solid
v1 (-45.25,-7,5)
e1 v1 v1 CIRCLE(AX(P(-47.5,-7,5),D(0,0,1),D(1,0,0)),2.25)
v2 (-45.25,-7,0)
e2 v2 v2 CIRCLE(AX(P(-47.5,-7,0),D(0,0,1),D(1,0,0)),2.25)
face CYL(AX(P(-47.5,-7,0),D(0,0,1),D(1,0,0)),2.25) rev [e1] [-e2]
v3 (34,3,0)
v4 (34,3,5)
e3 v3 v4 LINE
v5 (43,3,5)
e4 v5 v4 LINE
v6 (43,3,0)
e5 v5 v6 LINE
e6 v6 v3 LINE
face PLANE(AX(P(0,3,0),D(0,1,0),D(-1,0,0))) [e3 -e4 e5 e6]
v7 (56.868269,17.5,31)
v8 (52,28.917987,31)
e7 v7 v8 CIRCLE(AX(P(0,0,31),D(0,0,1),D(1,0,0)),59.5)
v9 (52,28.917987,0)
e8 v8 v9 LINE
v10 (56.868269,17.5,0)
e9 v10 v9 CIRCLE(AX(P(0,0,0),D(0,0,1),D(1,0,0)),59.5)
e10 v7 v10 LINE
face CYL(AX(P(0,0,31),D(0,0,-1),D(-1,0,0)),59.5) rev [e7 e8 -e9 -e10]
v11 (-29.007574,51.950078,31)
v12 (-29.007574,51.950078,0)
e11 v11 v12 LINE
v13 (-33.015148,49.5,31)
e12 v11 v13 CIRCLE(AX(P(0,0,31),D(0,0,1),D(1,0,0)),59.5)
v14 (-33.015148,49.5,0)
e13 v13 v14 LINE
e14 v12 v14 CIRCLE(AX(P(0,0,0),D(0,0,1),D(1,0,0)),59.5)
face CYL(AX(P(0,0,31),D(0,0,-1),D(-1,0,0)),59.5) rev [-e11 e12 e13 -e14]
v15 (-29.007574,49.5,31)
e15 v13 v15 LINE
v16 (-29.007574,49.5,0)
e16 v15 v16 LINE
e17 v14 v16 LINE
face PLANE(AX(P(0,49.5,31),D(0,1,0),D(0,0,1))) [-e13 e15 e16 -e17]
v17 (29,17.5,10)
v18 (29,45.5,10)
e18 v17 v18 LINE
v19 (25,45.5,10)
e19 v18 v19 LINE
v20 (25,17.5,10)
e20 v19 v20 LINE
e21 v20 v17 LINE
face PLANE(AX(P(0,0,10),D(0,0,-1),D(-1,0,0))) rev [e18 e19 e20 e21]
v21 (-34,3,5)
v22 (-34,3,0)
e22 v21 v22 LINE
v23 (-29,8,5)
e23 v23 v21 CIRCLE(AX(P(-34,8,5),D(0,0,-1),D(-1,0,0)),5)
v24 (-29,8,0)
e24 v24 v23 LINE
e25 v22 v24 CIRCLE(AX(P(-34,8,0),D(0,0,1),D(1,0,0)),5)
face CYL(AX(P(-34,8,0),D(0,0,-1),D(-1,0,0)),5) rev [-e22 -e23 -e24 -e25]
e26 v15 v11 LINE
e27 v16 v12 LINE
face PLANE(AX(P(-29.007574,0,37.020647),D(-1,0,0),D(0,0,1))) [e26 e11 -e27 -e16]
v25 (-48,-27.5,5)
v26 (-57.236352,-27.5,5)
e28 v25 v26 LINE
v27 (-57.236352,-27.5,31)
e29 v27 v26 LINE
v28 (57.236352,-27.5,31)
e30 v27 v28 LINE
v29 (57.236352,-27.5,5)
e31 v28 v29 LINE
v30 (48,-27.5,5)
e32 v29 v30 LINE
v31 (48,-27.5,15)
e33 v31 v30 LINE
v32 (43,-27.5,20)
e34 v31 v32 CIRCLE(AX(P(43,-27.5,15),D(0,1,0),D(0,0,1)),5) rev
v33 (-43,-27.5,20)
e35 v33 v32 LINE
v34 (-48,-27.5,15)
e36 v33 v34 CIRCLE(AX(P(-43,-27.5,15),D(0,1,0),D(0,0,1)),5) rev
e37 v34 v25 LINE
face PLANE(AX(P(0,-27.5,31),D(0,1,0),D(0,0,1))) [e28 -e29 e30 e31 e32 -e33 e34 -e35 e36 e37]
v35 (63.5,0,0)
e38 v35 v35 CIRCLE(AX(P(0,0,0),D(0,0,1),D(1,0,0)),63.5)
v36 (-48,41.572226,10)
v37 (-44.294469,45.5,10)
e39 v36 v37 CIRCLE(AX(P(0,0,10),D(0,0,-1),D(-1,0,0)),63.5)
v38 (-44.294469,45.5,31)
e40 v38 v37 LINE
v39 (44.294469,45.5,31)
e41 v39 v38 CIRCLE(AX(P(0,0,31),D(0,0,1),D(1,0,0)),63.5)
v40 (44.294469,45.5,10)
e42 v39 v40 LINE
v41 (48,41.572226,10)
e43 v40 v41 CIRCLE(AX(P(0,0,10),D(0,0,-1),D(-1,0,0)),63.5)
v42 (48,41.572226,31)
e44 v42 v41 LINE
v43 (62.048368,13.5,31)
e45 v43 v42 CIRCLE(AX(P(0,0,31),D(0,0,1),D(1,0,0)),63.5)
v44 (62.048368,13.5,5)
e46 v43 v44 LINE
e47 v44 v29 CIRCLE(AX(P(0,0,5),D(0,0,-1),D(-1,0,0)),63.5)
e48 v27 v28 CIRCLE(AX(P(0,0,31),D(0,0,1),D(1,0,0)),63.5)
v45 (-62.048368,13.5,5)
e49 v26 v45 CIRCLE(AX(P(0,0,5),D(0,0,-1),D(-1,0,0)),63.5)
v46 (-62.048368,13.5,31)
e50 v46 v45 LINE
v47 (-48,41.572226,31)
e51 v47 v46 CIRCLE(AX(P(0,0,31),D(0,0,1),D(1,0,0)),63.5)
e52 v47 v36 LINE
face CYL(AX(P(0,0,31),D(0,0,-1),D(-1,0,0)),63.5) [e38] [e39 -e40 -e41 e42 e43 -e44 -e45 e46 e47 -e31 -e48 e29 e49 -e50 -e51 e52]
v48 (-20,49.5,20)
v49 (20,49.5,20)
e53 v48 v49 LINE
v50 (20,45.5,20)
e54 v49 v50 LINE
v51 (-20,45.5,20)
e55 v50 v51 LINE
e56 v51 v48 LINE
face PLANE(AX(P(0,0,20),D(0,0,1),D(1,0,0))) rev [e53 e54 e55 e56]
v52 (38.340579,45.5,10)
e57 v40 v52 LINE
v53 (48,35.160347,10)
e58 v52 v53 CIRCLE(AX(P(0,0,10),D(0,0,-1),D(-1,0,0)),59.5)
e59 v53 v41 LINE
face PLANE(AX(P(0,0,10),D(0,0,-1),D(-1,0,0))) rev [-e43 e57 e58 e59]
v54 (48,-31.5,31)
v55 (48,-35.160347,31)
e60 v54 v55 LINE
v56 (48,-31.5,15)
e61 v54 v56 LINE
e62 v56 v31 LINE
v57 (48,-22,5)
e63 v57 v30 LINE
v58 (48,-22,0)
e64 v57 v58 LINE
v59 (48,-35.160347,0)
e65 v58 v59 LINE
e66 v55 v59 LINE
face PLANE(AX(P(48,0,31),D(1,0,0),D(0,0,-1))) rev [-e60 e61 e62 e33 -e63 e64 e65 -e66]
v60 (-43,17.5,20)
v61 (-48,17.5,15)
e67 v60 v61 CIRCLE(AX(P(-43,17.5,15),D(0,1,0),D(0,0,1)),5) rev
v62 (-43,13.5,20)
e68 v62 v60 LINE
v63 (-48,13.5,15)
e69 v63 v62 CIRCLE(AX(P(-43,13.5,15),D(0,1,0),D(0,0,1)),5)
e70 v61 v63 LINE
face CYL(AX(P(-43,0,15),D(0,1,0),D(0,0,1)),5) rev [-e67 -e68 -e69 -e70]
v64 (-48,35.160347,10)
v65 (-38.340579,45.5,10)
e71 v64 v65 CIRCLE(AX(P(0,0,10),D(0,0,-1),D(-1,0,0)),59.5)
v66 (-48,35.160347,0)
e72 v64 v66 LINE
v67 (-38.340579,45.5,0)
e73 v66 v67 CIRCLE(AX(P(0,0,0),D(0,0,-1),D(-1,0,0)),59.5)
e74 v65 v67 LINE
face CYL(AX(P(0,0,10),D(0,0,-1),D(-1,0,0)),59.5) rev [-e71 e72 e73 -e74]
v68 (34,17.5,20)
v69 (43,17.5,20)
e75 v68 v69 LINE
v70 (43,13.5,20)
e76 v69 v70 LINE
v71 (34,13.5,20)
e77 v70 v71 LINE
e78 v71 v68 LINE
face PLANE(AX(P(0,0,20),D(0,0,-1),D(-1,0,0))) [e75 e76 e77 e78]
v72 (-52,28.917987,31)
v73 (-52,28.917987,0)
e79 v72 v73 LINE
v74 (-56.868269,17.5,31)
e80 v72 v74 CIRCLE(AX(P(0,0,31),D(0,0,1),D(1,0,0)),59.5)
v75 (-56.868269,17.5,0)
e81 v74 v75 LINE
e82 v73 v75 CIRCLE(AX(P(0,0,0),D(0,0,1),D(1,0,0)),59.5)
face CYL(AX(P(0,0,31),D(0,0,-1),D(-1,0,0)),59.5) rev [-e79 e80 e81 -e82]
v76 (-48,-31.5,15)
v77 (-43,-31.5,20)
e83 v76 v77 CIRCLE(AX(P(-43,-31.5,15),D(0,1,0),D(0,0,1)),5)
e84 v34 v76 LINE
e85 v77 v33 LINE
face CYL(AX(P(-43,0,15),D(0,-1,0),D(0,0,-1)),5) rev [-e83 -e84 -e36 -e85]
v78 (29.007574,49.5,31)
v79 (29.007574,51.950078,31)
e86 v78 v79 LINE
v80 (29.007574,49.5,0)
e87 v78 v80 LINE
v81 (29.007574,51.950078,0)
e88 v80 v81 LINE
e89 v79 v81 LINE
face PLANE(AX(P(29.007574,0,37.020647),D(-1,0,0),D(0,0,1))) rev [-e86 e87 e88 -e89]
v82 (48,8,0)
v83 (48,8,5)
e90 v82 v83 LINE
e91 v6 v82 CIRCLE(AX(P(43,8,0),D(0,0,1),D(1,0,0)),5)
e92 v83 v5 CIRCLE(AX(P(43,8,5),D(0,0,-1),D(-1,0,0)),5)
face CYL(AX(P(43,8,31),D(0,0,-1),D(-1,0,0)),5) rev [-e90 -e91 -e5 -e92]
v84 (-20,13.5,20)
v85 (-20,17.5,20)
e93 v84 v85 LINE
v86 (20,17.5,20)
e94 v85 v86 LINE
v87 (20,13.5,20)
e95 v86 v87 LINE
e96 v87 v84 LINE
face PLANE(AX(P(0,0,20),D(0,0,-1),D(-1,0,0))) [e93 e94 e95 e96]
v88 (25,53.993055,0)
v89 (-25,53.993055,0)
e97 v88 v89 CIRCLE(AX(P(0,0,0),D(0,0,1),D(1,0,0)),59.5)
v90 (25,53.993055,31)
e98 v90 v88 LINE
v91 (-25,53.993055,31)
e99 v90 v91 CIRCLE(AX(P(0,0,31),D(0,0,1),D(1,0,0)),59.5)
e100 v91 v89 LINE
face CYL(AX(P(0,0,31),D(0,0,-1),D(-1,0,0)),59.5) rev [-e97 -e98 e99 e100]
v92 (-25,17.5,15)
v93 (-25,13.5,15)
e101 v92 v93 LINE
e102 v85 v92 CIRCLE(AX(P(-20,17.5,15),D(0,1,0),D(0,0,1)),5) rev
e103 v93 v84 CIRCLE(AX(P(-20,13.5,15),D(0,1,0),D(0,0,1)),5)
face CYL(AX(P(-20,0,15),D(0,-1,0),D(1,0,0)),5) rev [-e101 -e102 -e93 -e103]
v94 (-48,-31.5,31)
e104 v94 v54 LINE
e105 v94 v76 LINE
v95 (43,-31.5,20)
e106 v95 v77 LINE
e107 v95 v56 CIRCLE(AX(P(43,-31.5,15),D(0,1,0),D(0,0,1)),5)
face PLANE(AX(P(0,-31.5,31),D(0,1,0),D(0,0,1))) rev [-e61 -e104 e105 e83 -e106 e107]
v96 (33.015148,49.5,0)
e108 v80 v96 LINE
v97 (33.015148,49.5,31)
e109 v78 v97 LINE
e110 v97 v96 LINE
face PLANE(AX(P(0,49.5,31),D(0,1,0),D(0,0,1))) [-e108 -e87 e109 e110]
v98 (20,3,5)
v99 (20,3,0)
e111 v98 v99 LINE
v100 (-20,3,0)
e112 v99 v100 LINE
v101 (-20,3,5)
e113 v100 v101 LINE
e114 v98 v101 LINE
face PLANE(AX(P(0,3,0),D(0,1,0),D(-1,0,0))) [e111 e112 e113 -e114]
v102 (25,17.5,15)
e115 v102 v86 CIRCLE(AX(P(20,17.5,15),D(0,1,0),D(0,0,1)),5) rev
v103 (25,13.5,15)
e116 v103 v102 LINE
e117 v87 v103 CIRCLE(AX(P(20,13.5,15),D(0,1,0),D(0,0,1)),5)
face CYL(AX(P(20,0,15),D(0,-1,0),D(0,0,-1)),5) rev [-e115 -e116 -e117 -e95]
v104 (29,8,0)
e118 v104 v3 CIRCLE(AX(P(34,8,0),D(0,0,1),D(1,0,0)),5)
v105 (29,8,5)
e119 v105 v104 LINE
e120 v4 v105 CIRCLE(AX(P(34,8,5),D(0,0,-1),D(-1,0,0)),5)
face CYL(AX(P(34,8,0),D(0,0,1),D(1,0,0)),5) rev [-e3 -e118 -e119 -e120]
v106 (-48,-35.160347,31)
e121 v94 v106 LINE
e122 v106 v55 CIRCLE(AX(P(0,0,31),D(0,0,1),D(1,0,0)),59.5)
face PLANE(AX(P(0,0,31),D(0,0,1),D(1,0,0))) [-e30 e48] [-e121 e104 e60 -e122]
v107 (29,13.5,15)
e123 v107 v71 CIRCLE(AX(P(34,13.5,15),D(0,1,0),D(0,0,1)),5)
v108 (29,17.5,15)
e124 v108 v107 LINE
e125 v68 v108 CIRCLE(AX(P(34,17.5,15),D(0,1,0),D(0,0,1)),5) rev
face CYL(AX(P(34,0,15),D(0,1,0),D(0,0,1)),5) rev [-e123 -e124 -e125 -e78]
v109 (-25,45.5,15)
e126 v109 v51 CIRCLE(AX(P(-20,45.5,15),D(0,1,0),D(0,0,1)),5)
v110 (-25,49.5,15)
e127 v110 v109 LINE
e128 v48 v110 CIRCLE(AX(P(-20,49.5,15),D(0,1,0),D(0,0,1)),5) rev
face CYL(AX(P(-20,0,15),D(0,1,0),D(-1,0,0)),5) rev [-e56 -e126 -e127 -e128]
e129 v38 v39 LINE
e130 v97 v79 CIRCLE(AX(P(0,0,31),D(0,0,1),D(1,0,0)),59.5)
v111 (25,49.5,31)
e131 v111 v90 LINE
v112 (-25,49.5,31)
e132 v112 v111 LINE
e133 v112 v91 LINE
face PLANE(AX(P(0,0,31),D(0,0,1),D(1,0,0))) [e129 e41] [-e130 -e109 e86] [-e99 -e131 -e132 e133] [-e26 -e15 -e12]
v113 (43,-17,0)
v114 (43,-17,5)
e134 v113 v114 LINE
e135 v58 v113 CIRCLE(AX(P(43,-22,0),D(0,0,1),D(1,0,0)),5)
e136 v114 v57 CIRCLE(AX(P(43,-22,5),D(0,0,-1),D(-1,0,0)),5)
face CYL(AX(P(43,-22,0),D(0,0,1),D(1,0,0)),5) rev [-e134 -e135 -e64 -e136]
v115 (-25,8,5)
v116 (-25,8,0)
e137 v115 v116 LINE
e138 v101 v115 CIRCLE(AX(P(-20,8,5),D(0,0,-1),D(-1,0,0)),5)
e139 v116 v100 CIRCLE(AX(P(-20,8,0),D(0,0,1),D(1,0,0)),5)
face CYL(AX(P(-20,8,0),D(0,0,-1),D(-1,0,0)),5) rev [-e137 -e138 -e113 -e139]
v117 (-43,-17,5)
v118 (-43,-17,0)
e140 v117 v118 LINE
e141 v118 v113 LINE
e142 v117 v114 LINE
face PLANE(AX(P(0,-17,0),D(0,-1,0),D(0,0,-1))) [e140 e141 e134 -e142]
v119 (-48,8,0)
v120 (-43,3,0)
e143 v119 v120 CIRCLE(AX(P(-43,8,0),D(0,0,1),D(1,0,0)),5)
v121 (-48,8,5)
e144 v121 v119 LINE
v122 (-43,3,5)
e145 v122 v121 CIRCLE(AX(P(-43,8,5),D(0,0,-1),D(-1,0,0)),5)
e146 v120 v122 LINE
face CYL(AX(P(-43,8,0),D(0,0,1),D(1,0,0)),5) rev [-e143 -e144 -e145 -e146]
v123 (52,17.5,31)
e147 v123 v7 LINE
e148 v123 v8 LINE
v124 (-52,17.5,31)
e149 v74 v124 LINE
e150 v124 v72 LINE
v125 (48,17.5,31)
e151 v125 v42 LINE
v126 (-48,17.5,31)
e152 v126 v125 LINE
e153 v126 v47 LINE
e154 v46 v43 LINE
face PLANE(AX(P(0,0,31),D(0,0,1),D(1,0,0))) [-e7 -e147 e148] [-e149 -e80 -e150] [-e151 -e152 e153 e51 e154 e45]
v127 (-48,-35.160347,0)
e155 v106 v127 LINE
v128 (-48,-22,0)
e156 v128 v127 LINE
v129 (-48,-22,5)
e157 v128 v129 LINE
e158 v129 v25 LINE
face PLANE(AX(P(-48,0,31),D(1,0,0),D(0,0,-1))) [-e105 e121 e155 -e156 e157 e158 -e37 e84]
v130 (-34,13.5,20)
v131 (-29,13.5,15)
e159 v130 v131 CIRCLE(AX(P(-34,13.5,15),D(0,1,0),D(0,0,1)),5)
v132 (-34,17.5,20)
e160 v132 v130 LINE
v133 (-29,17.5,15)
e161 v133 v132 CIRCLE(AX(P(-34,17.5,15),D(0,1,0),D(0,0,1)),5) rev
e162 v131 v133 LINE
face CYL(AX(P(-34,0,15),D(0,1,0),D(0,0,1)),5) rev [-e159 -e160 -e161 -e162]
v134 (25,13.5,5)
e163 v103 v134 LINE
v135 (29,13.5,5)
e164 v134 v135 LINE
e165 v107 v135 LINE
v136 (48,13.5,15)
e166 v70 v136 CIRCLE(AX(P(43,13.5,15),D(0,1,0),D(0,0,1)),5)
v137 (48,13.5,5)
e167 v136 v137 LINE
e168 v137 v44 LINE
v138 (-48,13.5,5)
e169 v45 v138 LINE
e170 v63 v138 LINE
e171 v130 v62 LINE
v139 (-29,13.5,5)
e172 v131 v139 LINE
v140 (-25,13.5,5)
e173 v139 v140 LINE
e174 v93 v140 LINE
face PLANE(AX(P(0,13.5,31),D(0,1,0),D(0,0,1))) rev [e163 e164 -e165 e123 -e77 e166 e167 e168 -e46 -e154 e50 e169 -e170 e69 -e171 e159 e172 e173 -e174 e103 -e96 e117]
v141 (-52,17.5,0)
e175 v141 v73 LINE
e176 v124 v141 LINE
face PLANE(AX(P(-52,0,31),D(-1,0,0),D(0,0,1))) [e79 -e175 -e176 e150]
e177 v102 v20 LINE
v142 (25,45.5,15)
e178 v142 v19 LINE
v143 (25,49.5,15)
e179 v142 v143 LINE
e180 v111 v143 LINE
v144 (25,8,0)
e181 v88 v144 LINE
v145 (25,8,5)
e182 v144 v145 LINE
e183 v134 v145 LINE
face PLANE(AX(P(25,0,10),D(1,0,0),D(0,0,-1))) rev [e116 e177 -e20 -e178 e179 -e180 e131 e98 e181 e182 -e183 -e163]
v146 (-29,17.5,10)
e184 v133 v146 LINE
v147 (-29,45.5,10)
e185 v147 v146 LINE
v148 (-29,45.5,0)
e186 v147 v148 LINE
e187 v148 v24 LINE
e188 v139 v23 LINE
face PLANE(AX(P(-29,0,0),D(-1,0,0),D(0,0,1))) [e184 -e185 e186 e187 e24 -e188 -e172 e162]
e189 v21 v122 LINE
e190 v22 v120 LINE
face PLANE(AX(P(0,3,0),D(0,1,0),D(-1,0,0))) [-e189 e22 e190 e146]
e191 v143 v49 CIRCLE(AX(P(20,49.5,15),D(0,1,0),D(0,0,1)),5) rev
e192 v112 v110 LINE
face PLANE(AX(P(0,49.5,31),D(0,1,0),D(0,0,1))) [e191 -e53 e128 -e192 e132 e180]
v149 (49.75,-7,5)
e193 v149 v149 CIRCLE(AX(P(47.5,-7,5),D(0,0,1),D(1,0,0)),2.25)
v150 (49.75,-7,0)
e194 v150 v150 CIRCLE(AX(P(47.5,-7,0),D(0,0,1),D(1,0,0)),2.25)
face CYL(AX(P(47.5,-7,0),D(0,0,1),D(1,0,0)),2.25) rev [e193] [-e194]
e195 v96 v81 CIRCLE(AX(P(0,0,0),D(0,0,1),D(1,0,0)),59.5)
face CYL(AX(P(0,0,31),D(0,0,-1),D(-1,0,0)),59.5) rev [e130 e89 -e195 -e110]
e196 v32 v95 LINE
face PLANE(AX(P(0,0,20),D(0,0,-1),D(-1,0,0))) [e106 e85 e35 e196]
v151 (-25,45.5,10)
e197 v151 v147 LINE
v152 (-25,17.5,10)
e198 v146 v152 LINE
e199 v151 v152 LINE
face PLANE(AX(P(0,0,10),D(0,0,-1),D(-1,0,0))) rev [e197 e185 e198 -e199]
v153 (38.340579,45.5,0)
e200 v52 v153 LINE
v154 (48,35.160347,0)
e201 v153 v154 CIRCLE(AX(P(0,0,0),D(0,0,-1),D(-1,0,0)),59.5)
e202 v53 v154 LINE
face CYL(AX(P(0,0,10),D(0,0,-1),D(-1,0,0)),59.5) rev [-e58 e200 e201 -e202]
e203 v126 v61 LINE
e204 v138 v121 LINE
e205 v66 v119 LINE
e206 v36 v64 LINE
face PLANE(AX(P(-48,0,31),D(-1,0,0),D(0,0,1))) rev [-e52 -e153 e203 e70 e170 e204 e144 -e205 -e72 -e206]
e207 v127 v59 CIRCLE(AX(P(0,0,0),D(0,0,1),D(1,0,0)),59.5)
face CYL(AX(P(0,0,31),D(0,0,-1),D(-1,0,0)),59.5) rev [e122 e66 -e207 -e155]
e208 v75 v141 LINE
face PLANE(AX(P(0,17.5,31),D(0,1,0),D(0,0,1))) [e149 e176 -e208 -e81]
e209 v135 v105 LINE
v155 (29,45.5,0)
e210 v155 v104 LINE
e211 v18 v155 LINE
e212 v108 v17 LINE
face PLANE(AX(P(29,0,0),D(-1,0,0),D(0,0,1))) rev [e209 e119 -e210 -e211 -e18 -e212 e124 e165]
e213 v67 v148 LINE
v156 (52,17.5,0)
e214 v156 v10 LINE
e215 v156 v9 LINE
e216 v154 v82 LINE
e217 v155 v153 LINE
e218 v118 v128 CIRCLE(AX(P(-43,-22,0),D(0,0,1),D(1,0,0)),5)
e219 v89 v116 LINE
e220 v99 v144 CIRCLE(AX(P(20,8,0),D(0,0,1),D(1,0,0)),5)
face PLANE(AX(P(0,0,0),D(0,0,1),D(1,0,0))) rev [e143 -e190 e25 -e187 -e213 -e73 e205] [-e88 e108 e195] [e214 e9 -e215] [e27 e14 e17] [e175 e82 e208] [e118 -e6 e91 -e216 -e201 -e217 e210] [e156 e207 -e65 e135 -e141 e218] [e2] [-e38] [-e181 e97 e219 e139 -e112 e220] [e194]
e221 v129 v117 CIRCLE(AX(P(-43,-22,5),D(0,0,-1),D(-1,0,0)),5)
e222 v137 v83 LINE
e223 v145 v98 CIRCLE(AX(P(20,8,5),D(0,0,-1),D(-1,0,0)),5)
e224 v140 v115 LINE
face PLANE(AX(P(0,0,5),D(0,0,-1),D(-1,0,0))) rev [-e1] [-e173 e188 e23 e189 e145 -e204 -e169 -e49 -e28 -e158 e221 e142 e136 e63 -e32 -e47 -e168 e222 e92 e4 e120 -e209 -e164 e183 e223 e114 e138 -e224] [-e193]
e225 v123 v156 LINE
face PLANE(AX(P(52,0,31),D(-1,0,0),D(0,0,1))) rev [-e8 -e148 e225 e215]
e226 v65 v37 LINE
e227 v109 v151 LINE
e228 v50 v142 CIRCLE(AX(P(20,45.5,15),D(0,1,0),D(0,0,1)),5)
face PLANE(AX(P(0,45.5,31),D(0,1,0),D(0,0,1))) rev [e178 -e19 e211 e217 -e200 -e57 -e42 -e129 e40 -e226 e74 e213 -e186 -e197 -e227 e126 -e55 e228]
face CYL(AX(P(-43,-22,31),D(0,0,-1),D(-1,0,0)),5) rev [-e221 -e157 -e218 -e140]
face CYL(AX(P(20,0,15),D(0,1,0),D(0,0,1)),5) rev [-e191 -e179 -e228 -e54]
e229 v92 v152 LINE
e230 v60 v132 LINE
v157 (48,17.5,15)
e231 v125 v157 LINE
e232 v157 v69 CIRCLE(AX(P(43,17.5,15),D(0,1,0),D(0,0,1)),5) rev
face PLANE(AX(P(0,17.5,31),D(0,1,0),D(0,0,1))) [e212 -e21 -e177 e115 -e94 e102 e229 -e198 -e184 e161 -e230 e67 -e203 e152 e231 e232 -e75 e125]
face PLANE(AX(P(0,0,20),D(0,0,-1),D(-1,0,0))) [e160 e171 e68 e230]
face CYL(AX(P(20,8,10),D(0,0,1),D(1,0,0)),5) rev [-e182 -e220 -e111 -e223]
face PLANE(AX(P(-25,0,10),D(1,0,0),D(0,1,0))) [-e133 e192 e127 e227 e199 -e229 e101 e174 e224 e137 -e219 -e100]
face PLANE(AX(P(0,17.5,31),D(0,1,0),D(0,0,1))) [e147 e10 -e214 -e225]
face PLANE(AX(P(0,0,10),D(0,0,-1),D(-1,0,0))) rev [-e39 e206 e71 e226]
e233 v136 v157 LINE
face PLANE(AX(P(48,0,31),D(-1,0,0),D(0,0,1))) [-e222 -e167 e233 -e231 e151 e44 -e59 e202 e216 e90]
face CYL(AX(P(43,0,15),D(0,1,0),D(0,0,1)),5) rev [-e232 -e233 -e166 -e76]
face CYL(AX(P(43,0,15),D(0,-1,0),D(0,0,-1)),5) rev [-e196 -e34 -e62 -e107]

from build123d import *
from build123d.topology import SkipClean

# Parameters (mm, degrees)
BOSS_EXTRUDE1_DEPTH = 31
BOSS_EXTRUDE3_DEPTH = 10
BOSS_EXTRUDE4_DEPTH = 5
SKETCH6_W           = 19
SKETCH6_H           = 10.5
SKETCH6_R           = 2.25
SKETCH6_W_2         = 50
SKETCH6_W_3         = 96
CUT_EXTRUDE1_DEPTH  = 94.490641243
CUT_EXTRUDE2_DEPTH  = 10
SKETCH9_W           = 96
SKETCH9_H           = 4
SKETCH9_W_2         = 19
SKETCH9_W_3         = 50
CUT_EXTRUDE4_DEPTH  = 20
BOSS_EXTRUDE5_DEPTH = 31
FILLET3_R           = 5


with BuildPart() as part:
    # Sketch1 → Boss-Extrude1 (new body)
    with BuildSketch(Plane.XY):
        with BuildLine():
            ThreePointArc((-50.477717856, -31.5), (-51.659400485, -29.522133079), (-52.763623833, -27.5))
            Line((-52.763623833, -27.5), (-57.236352085, -27.5))
            ThreePointArc((-57.236352085, -27.5), (0, -63.5), (57.236352085, -27.5))
            Line((57.236352085, -27.5), (52.763623833, -27.5))
            ThreePointArc((52.763623833, -27.5), (51.659400485, -29.522133079), (50.477717856, -31.5))
            ThreePointArc((50.477717856, -31.5), (49.272860314, -33.353189299), (48, -35.160346983))
            ThreePointArc((48, -35.160346983), (0, -59.5), (-48, -35.160346983))
            ThreePointArc((-48, -35.160346983), (-49.272860314, -33.353189299), (-50.477717856, -31.5))
        make_face()
        with BuildLine():
            Line((52.763623833, -27.5), (-52.763623833, -27.5))
            ThreePointArc((-52.763623833, -27.5), (-51.659400485, -29.522133079), (-50.477717856, -31.5))
            Line((-50.477717856, -31.5), (-48, -31.5))
            Line((-48, -31.5), (48, -31.5))
            Line((48, -31.5), (50.477717856, -31.5))
            ThreePointArc((50.477717856, -31.5), (51.659400485, -29.522133079), (52.763623833, -27.5))
        make_face()
        with BuildLine():
            ThreePointArc((-56.868268832, 17.5), (-57.443088433, 15.50940332), (-57.948252778, 13.5))
            Line((-57.948252778, 13.5), (57.948252778, 13.5))
            ThreePointArc((57.948252778, 13.5), (57.443088433, 15.50940332), (56.868268832, 17.5))
            Line((56.868268832, 17.5), (52, 17.5))
            Line((52, 17.5), (48, 17.5))
            Line((48, 17.5), (-48, 17.5))
            Line((-48, 17.5), (-52, 17.5))
            Line((-52, 17.5), (-56.868268832, 17.5))
        make_face()
        with BuildLine():
            Line((-52, 28.917987482), (-52, 17.5))
            Line((-52, 17.5), (-48, 17.5))
            Line((-48, 17.5), (-48, 35.160346983))
            ThreePointArc((-48, 35.160346983), (-50.097322913, 32.101530134), (-52, 28.917987482))
        make_face()
        with BuildLine():
            Line((-62.04836823, 13.5), (-57.948252778, 13.5))
            ThreePointArc((-57.948252778, 13.5), (-57.443088433, 15.50940332), (-56.868268832, 17.5))
            ThreePointArc((-56.868268832, 17.5), (-54.732692234, 23.336289354), (-52, 28.917987482))
            ThreePointArc((-52, 28.917987482), (-50.097322913, 32.101530134), (-48, 35.160346983))
            Line((-48, 35.160346983), (-48, 41.572226306))
            ThreePointArc((-48, 41.572226306), (-56.78620704, 28.417893835), (-62.04836823, 13.5))
        make_face()
        with BuildLine():
            ThreePointArc((56.868268832, 17.5), (57.443088433, 15.50940332), (57.948252778, 13.5))
            Line((57.948252778, 13.5), (62.04836823, 13.5))
            ThreePointArc((62.04836823, 13.5), (56.78620704, 28.417893835), (48, 41.572226306))
            Line((48, 41.572226306), (48, 35.160346983))
            ThreePointArc((48, 35.160346983), (50.097322913, 32.101530134), (52, 28.917987482))
            ThreePointArc((52, 28.917987482), (54.732692234, 23.336289354), (56.868268832, 17.5))
        make_face()
        with BuildLine():
            Line((48, 17.5), (52, 17.5))
            Line((52, 17.5), (52, 28.917987482))
            ThreePointArc((52, 28.917987482), (50.097322913, 32.101530134), (48, 35.160346983))
            Line((48, 35.160346983), (48, 17.5))
        make_face()
        with BuildLine():
            ThreePointArc((44.294469181, 45.5), (0, 63.5), (-44.294469181, 45.5))
            Line((-44.294469181, 45.5), (-38.340579025, 45.5))
            ThreePointArc((-38.340579025, 45.5), (-35.733876731, 47.574573606), (-33.015148038, 49.5))
            ThreePointArc((-33.015148038, 49.5), (0, 59.5), (33.015148038, 49.5))
            ThreePointArc((33.015148038, 49.5), (35.733876731, 47.574573606), (38.340579025, 45.5))
            Line((38.340579025, 45.5), (44.294469181, 45.5))
        make_face()
        with BuildLine():
            ThreePointArc((-33.015148038, 49.5), (-35.733876731, 47.574573606), (-38.340579025, 45.5))
            Line((-38.340579025, 45.5), (38.340579025, 45.5))
            ThreePointArc((38.340579025, 45.5), (35.733876731, 47.574573606), (33.015148038, 49.5))
            Line((33.015148038, 49.5), (-33.015148038, 49.5))
        make_face()
        with BuildLine():
            ThreePointArc((48, -35.160346983), (49.272860314, -33.353189299), (50.477717856, -31.5))
            Line((50.477717856, -31.5), (48, -31.5))
            Line((48, -31.5), (48, -35.160346983))
        make_face()
        with BuildLine():
            Line((-48, -31.5), (-50.477717856, -31.5))
            ThreePointArc((-50.477717856, -31.5), (-49.272860314, -33.353189299), (-48, -35.160346983))
            Line((-48, -35.160346983), (-48, -31.5))
        make_face()
    extrude(amount=BOSS_EXTRUDE1_DEPTH)

    # Sketch2 → Boss-Extrude3 (add)
    with SkipClean():  # the faces are left unmerged after this step: merging them gives an invalid solid
        with BuildSketch(Plane(origin=(0, 0, 0), x_dir=(-1, 0, 0), z_dir=(0, 0, -1))):
            with BuildLine():
                ThreePointArc((48, 41.572226306), (46.189004231, 43.575519367), (44.294469181, 45.5))
                Line((44.294469181, 45.5), (25, 45.5))
                Line((25, 45.5), (25, 17.5))
                Line((25, 17.5), (48, 17.5))
                Line((48, 17.5), (48, 41.572226306))
            make_face()
            with BuildLine():
                Line((-25, 45.5), (-44.294469181, 45.5))
                ThreePointArc((-44.294469181, 45.5), (-46.189004231, 43.575519367), (-48, 41.572226306))
                Line((-48, 41.572226306), (-48, 17.5))
                Line((-48, 17.5), (-25, 17.5))
                Line((-25, 17.5), (-25, 45.5))
            make_face()
        extrude(amount=-BOSS_EXTRUDE3_DEPTH)

    # Sketch4 → Boss-Extrude4 (add)
    with SkipClean():  # the faces are left unmerged after this step: merging them gives an invalid solid
        with BuildSketch(Plane(origin=(0, 0, 0), x_dir=(-1, 0, 0), z_dir=(0, 0, -1))):
            with BuildLine():
                Line((-57.236352085, -27.5), (57.236352085, -27.5))
                ThreePointArc((57.236352085, -27.5), (63.067116036, -7.401950746), (62.04836823, 13.5))
                Line((62.04836823, 13.5), (-62.04836823, 13.5))
                ThreePointArc((-62.04836823, 13.5), (-63.067116036, -7.401950746), (-57.236352085, -27.5))
            make_face()
        extrude(amount=-BOSS_EXTRUDE4_DEPTH)

    # Sketch6 → Cut-Extrude1 (cut, through all)
    with SkipClean():  # the faces are left unmerged after this step: merging them gives an invalid solid
        with BuildSketch(Plane.XY.offset(5)):
            with Locations((-38.5, 8.25)):
                Rectangle(SKETCH6_W, SKETCH6_H)
            with Locations((-47.5, -7)):
                Circle(SKETCH6_R)
            with Locations((0, 8.25)):
                Rectangle(SKETCH6_W_2, SKETCH6_H)
            with Locations((0, -22.25)):
                Rectangle(SKETCH6_W_3, SKETCH6_H)
            with Locations((38.5, 8.25)):
                Rectangle(SKETCH6_W, SKETCH6_H)
            with Locations((47.5, -7)):
                Circle(SKETCH6_R)
        extrude(amount=-CUT_EXTRUDE1_DEPTH, mode=Mode.SUBTRACT)

    # Sketch7 → Cut-Extrude2 (cut)
    with SkipClean():  # the faces are left unmerged after this step: merging them gives an invalid solid
        with BuildSketch(Plane(origin=(0, 0, 0), x_dir=(-1, 0, 0), z_dir=(0, 0, -1))):
            with BuildLine():
                Line((-29, 17.5), (-48, 17.5))
                Line((-48, 17.5), (-48, 35.160346983))
                ThreePointArc((-48, 35.160346983), (-43.478741964, 40.618333265), (-38.340579025, 45.5))
                Line((-38.340579025, 45.5), (-29, 45.5))
                Line((-29, 45.5), (-29, 17.5))
            make_face()
            with BuildLine():
                Line((29, 17.5), (48, 17.5))
                Line((48, 17.5), (48, 35.160346983))
                ThreePointArc((48, 35.160346983), (43.478741964, 40.618333265), (38.340579025, 45.5))
                Line((38.340579025, 45.5), (29, 45.5))
                Line((29, 45.5), (29, 17.5))
            make_face()
        extrude(amount=-CUT_EXTRUDE2_DEPTH, mode=Mode.SUBTRACT)

    # Sketch9 → Cut-Extrude4 (cut)
    with SkipClean():  # the faces are left unmerged after this step: merging them gives an invalid solid
        with BuildSketch(Plane(origin=(0, 0, 0), x_dir=(-1, 0, 0), z_dir=(0, 0, -1))):
            with Locations((0, -29.5)):
                Rectangle(SKETCH9_W, SKETCH9_H)
            with Locations((-38.5, 15.5)):
                Rectangle(SKETCH9_W_2, SKETCH9_H)
            with Locations((0, 15.5)):
                Rectangle(SKETCH9_W_3, SKETCH9_H)
            with Locations((38.5, 15.5)):
                Rectangle(SKETCH9_W_2, SKETCH9_H)
            with Locations((0, 47.5)):
                Rectangle(SKETCH9_W_3, SKETCH9_H)
        extrude(amount=-CUT_EXTRUDE4_DEPTH, mode=Mode.SUBTRACT)

    # Sketch10 → Boss-Extrude5 (add)
    with SkipClean():  # the faces are left unmerged after this step: merging them gives an invalid solid
        with BuildSketch(Plane(origin=(0, 0, 0), x_dir=(-1, 0, 0), z_dir=(0, 0, -1))):
            with BuildLine():
                Line((-29.007574019, 51.950078436), (-29.007574019, 49.5))
                Line((-29.007574019, 49.5), (-25, 49.5))
                Line((-25, 49.5), (-25, 53.993055109))
                ThreePointArc((-25, 53.993055109), (-27.023100327, 53.009452447), (-29.007574019, 51.950078436))
            make_face()
            with BuildLine():
                ThreePointArc((29.007574019, 51.950078436), (27.023100327, 53.009452447), (25, 53.993055109))
                Line((25, 53.993055109), (25, 49.5))
                Line((25, 49.5), (29.007574019, 49.5))
                Line((29.007574019, 49.5), (29.007574019, 51.950078436))
            make_face()
        extrude(amount=-BOSS_EXTRUDE5_DEPTH)

    # Fillet3
    # the kernel refuses this fillet: 5 mm, written as the material it adds along each edge
    with BuildSketch(Plane(origin=(48, -17, 5), x_dir=(-1, 0, 0), z_dir=(0, 0, -1)), Plane(origin=(-48, -17, 5), x_dir=(0, -1, 0), z_dir=(0, 0, -1)), Plane(origin=(-29, 3, 5), x_dir=(0, 1, 0), z_dir=(0, 0, -1)), Plane(origin=(25, 3, 5), x_dir=(0, 1, 0), z_dir=(0, 0, -1)), Plane(origin=(48, 3, 5), x_dir=(0, 1, 0), z_dir=(0, 0, -1))) as fillet3_piece_1:
        with BuildLine():
            CenterArc((FILLET3_R, -FILLET3_R), FILLET3_R, 90, 90)
            Line((0, -FILLET3_R), (0, 0))
            Line((0, 0), (FILLET3_R, 0))
        make_face()
    extrude(amount=5)
    with BuildSketch(Plane(origin=(-48, 3, 5), x_dir=(0, 1, 0), z_dir=(0, 0, -1)), Plane(origin=(-25, 3, 5), x_dir=(0, 1, 0), z_dir=(0, 0, -1)), Plane(origin=(29, 3, 5), x_dir=(0, 1, 0), z_dir=(0, 0, -1))) as fillet3_piece_2:
        with BuildLine():
            CenterArc((FILLET3_R, FILLET3_R), FILLET3_R, 180, 90)
            Line((0, FILLET3_R), (0, 0))
            Line((0, 0), (FILLET3_R, 0))
        make_face()
    extrude(amount=5)
    with BuildSketch(Plane(origin=(48, -31.5, 20), x_dir=(0, 0, -1), z_dir=(0, 1, 0)), Plane(origin=(25, 49.5, 20), x_dir=(-1, 0, 0), z_dir=(0, -1, 0)), Plane(origin=(-29, 13.5, 20), x_dir=(0, 0, -1), z_dir=(0, 1, 0)), Plane(origin=(-48, 17.5, 20), x_dir=(0, 0, -1), z_dir=(0, -1, 0)), Plane(origin=(25, 13.5, 20), x_dir=(0, 0, -1), z_dir=(0, 1, 0))) as fillet3_piece_3:
        with BuildLine():
            CenterArc((FILLET3_R, FILLET3_R), FILLET3_R, 180, 90)
            Line((0, FILLET3_R), (0, 0))
            Line((0, 0), (FILLET3_R, 0))
        make_face()
    extrude(amount=4)
    with BuildSketch(Plane(origin=(-48, -27.5, 20), x_dir=(1, 0, 0), z_dir=(0, -1, 0)), Plane(origin=(-25, 45.5, 20), x_dir=(0, 0, -1), z_dir=(0, 1, 0)), Plane(origin=(-25, 17.5, 20), x_dir=(1, 0, 0), z_dir=(0, -1, 0)), Plane(origin=(48, 13.5, 20), x_dir=(-1, 0, 0), z_dir=(0, 1, 0)), Plane(origin=(29, 17.5, 20), x_dir=(1, 0, 0), z_dir=(0, -1, 0))) as fillet3_piece_4:
        with BuildLine():
            CenterArc((FILLET3_R, -FILLET3_R), FILLET3_R, 90, 90)
            Line((0, -FILLET3_R), (0, 0))
            Line((0, 0), (FILLET3_R, 0))
        make_face()
    extrude(amount=4)


solid = part.part
